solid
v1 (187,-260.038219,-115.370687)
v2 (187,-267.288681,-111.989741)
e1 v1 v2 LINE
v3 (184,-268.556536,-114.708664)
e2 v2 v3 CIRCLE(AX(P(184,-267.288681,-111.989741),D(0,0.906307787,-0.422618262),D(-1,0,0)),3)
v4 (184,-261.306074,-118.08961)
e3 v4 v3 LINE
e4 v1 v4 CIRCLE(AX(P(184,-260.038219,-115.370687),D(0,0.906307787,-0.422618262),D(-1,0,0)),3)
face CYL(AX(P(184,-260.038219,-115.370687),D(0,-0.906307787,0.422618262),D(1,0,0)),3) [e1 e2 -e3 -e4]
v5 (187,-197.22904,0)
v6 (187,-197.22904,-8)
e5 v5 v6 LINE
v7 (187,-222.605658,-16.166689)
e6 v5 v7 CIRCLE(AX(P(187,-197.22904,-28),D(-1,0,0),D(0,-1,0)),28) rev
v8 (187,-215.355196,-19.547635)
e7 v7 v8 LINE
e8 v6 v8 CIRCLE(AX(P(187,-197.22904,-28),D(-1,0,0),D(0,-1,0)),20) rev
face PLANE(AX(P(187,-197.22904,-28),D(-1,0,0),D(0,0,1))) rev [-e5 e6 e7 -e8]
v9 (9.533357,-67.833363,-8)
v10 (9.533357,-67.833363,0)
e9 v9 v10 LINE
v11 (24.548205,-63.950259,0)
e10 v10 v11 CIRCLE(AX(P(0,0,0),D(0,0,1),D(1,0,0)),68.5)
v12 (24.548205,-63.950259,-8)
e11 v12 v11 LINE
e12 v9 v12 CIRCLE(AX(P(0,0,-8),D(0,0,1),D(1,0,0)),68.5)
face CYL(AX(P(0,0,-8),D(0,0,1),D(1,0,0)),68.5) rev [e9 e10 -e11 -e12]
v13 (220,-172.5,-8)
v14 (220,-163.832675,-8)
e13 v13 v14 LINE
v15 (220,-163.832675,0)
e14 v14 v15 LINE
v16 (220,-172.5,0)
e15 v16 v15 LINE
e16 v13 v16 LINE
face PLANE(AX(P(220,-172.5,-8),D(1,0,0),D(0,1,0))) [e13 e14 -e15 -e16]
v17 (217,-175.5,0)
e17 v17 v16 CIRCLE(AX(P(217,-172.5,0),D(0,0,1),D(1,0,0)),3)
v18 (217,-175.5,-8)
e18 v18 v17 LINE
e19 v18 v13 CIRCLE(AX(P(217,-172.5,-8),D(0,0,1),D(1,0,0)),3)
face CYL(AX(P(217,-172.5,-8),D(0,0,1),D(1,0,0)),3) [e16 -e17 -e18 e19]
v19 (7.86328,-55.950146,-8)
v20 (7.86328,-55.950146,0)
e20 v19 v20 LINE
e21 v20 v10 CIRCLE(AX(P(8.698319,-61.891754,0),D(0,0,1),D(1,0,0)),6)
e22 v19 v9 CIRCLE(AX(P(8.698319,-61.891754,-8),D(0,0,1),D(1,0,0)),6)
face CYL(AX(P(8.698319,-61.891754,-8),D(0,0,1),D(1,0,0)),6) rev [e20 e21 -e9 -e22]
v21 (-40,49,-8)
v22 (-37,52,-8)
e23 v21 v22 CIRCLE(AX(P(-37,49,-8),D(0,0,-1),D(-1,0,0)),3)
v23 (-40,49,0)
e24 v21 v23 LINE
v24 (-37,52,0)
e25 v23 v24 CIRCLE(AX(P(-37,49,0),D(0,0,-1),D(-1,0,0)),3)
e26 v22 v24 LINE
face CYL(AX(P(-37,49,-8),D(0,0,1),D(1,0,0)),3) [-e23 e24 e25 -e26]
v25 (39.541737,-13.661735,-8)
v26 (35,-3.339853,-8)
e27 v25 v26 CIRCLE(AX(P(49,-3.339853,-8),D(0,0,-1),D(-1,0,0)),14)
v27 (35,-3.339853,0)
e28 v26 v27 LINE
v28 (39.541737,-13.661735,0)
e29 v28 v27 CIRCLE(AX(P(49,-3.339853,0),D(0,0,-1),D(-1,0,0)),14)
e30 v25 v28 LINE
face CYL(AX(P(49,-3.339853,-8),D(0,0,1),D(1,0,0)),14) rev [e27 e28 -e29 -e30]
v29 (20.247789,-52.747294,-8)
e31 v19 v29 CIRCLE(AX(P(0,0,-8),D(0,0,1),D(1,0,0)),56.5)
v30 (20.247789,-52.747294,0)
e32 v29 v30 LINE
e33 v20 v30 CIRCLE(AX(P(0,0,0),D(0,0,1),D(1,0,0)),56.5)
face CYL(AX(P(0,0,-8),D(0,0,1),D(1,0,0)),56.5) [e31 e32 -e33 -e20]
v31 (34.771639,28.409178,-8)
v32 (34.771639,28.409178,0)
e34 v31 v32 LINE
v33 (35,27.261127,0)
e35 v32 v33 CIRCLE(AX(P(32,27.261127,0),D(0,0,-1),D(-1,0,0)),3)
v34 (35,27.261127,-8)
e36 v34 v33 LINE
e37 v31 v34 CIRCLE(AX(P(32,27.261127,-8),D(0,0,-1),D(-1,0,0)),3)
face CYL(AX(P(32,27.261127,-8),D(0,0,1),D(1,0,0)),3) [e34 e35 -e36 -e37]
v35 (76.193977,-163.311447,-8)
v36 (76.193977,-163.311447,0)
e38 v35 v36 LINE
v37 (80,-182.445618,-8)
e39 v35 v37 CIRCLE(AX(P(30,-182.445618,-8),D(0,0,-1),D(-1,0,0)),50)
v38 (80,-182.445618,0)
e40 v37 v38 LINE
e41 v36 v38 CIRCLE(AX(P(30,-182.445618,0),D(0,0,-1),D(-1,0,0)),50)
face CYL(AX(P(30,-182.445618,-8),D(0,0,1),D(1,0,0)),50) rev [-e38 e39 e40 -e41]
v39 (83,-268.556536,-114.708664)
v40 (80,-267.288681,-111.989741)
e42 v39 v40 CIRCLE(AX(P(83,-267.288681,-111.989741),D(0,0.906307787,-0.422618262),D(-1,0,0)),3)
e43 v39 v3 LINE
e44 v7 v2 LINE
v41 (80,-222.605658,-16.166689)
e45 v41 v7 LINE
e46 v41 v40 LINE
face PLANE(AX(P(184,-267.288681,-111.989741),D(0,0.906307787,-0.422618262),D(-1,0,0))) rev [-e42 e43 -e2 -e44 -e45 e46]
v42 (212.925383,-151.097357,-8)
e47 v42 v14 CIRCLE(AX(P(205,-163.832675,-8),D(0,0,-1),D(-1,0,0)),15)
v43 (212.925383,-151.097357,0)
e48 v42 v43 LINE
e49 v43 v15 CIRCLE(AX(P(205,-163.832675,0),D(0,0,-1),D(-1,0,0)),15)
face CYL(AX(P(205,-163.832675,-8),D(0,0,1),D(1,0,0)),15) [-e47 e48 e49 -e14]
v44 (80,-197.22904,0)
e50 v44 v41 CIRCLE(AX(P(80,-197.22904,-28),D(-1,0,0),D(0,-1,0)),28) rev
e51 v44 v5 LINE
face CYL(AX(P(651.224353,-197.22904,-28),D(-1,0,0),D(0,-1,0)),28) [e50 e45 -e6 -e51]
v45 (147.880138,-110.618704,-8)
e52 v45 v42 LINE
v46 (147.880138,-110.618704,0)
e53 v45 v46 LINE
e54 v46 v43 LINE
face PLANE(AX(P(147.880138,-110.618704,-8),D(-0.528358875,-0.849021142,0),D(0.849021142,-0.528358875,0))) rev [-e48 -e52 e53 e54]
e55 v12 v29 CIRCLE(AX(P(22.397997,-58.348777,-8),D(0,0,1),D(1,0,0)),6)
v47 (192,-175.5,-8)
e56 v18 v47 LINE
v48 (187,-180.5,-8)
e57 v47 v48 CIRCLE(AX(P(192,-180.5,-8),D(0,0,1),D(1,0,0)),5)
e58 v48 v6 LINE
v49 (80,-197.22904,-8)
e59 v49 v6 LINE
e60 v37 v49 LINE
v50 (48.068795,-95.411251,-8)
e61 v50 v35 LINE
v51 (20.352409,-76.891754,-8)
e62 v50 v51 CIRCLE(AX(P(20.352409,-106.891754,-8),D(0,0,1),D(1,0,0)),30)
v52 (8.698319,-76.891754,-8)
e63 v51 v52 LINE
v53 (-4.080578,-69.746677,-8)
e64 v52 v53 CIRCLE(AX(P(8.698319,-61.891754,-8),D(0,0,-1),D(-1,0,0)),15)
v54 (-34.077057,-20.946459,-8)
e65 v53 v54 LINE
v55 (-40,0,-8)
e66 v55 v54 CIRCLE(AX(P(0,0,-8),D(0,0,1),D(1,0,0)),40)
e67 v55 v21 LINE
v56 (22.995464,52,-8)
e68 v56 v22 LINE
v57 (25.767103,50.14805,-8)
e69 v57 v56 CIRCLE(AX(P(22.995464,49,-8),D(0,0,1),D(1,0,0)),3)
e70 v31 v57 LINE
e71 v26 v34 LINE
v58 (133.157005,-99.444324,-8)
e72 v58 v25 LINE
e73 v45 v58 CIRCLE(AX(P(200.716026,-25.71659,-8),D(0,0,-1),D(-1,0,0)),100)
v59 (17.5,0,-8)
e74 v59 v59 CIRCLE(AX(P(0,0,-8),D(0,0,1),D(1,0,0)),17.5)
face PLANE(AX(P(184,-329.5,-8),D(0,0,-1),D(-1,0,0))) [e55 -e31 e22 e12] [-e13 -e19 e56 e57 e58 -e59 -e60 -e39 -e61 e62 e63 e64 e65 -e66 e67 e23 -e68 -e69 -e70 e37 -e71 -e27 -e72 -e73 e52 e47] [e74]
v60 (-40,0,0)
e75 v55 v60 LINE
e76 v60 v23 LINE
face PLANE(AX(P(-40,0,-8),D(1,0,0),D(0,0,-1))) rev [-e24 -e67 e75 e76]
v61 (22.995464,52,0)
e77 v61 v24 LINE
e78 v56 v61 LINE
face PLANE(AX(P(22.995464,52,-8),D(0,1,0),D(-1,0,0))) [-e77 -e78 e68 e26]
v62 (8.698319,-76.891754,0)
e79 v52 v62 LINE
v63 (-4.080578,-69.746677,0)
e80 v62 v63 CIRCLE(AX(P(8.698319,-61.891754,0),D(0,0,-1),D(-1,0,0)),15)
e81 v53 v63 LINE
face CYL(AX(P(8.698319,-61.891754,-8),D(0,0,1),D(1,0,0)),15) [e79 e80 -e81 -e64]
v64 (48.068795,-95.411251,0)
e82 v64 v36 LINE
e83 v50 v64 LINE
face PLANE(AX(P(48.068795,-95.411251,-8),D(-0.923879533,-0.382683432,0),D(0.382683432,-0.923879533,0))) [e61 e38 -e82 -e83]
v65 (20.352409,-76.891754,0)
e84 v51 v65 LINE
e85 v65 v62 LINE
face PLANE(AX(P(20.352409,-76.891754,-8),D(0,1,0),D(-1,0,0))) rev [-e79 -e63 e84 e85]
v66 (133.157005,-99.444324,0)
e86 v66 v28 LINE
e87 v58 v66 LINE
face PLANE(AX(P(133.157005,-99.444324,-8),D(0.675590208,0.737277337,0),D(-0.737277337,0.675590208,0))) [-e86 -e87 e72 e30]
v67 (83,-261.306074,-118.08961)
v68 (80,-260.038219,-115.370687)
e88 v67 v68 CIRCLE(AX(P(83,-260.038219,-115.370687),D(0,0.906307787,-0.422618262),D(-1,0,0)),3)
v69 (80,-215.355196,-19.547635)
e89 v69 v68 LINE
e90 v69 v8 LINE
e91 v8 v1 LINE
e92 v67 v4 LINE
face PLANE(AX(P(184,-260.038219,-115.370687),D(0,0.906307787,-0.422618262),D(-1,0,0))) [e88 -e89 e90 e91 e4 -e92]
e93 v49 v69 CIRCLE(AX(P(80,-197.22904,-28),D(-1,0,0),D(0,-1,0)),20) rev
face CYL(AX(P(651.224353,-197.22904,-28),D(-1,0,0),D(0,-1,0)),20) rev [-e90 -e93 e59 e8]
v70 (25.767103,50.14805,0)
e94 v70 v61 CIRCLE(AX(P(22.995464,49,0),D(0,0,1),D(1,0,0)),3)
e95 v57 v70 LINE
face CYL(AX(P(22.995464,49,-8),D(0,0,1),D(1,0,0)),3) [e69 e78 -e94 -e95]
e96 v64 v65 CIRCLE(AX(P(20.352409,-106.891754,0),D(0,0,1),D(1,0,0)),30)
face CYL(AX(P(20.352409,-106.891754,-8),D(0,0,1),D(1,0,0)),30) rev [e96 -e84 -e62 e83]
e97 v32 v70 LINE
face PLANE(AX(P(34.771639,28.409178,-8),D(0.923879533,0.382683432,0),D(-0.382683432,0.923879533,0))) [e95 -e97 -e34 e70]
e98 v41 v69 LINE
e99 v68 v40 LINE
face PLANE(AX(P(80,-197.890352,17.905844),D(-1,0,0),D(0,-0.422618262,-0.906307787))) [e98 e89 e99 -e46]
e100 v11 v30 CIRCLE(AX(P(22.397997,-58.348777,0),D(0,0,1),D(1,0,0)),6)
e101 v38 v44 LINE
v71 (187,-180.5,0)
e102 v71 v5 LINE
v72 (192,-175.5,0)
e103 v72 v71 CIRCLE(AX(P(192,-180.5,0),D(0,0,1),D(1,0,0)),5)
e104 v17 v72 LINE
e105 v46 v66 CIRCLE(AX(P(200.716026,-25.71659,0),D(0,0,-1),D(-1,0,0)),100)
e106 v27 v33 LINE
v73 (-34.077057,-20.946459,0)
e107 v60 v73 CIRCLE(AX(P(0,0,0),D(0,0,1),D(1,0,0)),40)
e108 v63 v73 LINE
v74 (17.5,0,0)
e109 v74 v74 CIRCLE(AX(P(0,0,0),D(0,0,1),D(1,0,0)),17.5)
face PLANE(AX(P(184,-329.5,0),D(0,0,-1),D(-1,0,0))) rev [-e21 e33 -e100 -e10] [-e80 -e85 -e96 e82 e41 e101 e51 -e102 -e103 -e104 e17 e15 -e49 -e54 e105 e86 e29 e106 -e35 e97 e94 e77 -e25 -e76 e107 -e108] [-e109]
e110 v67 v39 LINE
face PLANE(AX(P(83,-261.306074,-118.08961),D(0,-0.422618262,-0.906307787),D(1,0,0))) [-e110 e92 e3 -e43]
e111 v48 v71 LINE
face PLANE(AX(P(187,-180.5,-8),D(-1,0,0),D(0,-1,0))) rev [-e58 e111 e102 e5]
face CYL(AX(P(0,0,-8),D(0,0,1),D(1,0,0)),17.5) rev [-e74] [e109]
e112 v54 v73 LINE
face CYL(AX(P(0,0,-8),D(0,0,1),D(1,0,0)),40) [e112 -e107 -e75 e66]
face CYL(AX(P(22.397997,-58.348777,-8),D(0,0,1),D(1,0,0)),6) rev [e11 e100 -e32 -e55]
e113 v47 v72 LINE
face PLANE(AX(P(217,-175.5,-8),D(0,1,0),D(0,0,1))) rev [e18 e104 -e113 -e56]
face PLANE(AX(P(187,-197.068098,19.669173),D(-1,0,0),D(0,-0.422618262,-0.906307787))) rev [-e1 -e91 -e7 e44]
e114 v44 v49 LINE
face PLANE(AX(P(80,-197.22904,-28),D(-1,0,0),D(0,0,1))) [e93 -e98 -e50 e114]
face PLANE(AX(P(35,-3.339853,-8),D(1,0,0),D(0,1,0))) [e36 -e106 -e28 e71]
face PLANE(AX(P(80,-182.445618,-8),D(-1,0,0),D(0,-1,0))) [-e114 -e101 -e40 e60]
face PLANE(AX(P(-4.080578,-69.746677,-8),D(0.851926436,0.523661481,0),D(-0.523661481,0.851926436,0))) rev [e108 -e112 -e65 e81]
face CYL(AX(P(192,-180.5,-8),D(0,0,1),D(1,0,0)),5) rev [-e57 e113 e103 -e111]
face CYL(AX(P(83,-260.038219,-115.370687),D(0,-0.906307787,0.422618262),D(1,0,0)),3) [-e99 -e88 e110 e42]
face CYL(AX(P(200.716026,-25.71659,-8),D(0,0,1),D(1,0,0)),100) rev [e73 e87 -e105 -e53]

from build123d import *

# Parameters (mm, degrees)
SKETCH1_R              = 17.5
BASE_EXTRUDE_DEPTH     = 8
PROCESS_BENDS1_START   = 80
PROCESS_BENDS1_DEPTH   = 107
PROCESS_BENDS1_2_DEPTH = 107
PROCESS_BENDS1_START_2 = -196
PROCESS_BENDS1_3_DEPTH = 34.029061455


with BuildPart() as part:
    # Sketch1 → Base-Extrude (new body)
    with BuildSketch(Plane.XY):
        with BuildLine():
            Line((83, -332.5), (184, -332.5))
            ThreePointArc((184, -332.5), (186.121320344, -331.621320344), (187, -329.5))
            Line((187, -329.5), (187, -180.5))
            ThreePointArc((187, -180.5), (188.464466094, -176.964466094), (192, -175.5))
            Line((192, -175.5), (217, -175.5))
            ThreePointArc((217, -175.5), (219.121320344, -174.621320344), (220, -172.5))
            Line((220, -172.5), (220, -163.832674563))
            ThreePointArc((220, -163.832674563), (218.112603612, -156.548470658), (212.925383131, -151.097357439))
            Line((212.925383131, -151.097357439), (147.880138289, -110.618704164))
            ThreePointArc((147.880138289, -110.618704164), (140.259841851, -105.372411008), (133.157005065, -99.444323689))
            Line((133.157005065, -99.444323689), (39.541737093, -13.661735283))
            ThreePointArc((39.541737093, -13.661735283), (36.185639292, -8.978306226), (35, -3.339852568))
            Line((35, -3.339852568), (35, 27.261127274))
            ThreePointArc((35, 27.261127274), (34.942355841, 27.84639824), (34.771638598, 28.409177571))
            Line((34.771638598, 28.409177571), (25.767102684, 50.148050297))
            ThreePointArc((25.767102684, 50.148050297), (24.662174785, 51.494408837), (22.995464086, 52))
            Line((22.995464086, 52), (-37, 52))
            ThreePointArc((-37, 52), (-39.121320344, 51.121320344), (-40, 49))
            Line((-40, 49), (-40, 0))
            ThreePointArc((-40, 0), (-38.490793042, -10.883880327), (-34.077057451, -20.946459259))
            Line((-34.077057451, -20.946459259), (-4.080577734, -69.746676518))
            ThreePointArc((-4.080577734, -69.746676518), (1.377930614, -74.984191681), (8.69831881, -76.891754296))
            Line((8.69831881, -76.891754296), (20.352408817, -76.891754296))
            ThreePointArc((20.352408817, -76.891754296), (37.019515808, -81.947665927), (48.068794793, -95.411251325))
            Line((48.068794793, -95.411251325), (76.193976626, -163.311446751))
            ThreePointArc((76.193976626, -163.311446751), (79.03926402, -172.691102268), (80, -182.445618369))
            Line((80, -182.445618369), (80, -329.5))
            ThreePointArc((80, -329.5), (80.878679656, -331.621320344), (83, -332.5))
        make_face()
        Circle(SKETCH1_R, mode=Mode.SUBTRACT)
        with BuildLine():
            ThreePointArc((7.863280204, -55.950145884), (14.146470229, -54.700341681), (20.247789149, -52.747294097))
            ThreePointArc((20.247789149, -52.747294097), (27.999479406, -56.198568959), (24.548204544, -63.950259215))
            ThreePointArc((24.548204544, -63.950259215), (17.151030278, -66.318113366), (9.533357416, -67.833362709))
            ThreePointArc((9.533357416, -67.833362709), (2.756710398, -62.726792902), (7.863280204, -55.950145884))
        make_face(mode=Mode.SUBTRACT)
    extrude(amount=-BASE_EXTRUDE_DEPTH)

    # Process-Bends1: read off the stored shape, not the designer's step
    # Process-Bends1 outline → Process-Bends1 (cut)
    with BuildSketch(Plane.YZ.offset(PROCESS_BENDS1_START)):
        with BuildLine():
            Line((-332.5, -8), (-216.824957909, -8))
            ThreePointArc((-216.824957909, -8), (-207.812045211, -2.077037206), (-197.229039967, 0))
            Line((-197.229039967, 0), (-332.5, 0))
            Line((-332.5, 0), (-332.5, -8))
        make_face()
    extrude(amount=PROCESS_BENDS1_DEPTH, mode=Mode.SUBTRACT)

    # Process-Bends1 2 outline → Process-Bends1 2 (add)
    with BuildSketch(Plane.YZ.offset(PROCESS_BENDS1_START)):
        with BuildLine():
            Line((-268.556535875, -114.70866427), (-261.306073579, -118.089610364))
            Line((-261.306073579, -118.089610364), (-215.355195707, -19.547634765))
            ThreePointArc((-215.355195707, -19.547634765), (-207.975032134, -11.132171084), (-197.229039967, -8))
            Line((-197.229039967, -8), (-216.824957909, -8))
            ThreePointArc((-216.824957909, -8), (-220.083053817, -11.823039502), (-222.605658004, -16.166688671))
            Line((-222.605658004, -16.166688671), (-268.556535875, -114.70866427))
        make_face()
    extrude(amount=PROCESS_BENDS1_2_DEPTH)

    # Process-Bends1 3 outline → Process-Bends1 3 (cut)
    with BuildSketch(Plane(origin=(0, 0, 0), x_dir=(1, 0, 0), z_dir=(0, 0.9063077870366512, -0.42261826174069705)).offset(PROCESS_BENDS1_START_2)):
        with BuildLine():
            Line((187, 217.458252039), (184, 217.458252039))
            ThreePointArc((184, 217.458252039), (186.121320344, 216.579572383), (187, 214.458252039))
            Line((187, 214.458252039), (187, 217.458252039))
        make_face()
        with BuildLine():
            ThreePointArc((80, 214.458252039), (80.878679656, 216.579572383), (83, 217.458252039))
            Line((83, 217.458252039), (80, 217.458252039))
            Line((80, 217.458252039), (80, 214.458252039))
        make_face()
    extrude(amount=PROCESS_BENDS1_3_DEPTH, mode=Mode.SUBTRACT)


solid = part.part
